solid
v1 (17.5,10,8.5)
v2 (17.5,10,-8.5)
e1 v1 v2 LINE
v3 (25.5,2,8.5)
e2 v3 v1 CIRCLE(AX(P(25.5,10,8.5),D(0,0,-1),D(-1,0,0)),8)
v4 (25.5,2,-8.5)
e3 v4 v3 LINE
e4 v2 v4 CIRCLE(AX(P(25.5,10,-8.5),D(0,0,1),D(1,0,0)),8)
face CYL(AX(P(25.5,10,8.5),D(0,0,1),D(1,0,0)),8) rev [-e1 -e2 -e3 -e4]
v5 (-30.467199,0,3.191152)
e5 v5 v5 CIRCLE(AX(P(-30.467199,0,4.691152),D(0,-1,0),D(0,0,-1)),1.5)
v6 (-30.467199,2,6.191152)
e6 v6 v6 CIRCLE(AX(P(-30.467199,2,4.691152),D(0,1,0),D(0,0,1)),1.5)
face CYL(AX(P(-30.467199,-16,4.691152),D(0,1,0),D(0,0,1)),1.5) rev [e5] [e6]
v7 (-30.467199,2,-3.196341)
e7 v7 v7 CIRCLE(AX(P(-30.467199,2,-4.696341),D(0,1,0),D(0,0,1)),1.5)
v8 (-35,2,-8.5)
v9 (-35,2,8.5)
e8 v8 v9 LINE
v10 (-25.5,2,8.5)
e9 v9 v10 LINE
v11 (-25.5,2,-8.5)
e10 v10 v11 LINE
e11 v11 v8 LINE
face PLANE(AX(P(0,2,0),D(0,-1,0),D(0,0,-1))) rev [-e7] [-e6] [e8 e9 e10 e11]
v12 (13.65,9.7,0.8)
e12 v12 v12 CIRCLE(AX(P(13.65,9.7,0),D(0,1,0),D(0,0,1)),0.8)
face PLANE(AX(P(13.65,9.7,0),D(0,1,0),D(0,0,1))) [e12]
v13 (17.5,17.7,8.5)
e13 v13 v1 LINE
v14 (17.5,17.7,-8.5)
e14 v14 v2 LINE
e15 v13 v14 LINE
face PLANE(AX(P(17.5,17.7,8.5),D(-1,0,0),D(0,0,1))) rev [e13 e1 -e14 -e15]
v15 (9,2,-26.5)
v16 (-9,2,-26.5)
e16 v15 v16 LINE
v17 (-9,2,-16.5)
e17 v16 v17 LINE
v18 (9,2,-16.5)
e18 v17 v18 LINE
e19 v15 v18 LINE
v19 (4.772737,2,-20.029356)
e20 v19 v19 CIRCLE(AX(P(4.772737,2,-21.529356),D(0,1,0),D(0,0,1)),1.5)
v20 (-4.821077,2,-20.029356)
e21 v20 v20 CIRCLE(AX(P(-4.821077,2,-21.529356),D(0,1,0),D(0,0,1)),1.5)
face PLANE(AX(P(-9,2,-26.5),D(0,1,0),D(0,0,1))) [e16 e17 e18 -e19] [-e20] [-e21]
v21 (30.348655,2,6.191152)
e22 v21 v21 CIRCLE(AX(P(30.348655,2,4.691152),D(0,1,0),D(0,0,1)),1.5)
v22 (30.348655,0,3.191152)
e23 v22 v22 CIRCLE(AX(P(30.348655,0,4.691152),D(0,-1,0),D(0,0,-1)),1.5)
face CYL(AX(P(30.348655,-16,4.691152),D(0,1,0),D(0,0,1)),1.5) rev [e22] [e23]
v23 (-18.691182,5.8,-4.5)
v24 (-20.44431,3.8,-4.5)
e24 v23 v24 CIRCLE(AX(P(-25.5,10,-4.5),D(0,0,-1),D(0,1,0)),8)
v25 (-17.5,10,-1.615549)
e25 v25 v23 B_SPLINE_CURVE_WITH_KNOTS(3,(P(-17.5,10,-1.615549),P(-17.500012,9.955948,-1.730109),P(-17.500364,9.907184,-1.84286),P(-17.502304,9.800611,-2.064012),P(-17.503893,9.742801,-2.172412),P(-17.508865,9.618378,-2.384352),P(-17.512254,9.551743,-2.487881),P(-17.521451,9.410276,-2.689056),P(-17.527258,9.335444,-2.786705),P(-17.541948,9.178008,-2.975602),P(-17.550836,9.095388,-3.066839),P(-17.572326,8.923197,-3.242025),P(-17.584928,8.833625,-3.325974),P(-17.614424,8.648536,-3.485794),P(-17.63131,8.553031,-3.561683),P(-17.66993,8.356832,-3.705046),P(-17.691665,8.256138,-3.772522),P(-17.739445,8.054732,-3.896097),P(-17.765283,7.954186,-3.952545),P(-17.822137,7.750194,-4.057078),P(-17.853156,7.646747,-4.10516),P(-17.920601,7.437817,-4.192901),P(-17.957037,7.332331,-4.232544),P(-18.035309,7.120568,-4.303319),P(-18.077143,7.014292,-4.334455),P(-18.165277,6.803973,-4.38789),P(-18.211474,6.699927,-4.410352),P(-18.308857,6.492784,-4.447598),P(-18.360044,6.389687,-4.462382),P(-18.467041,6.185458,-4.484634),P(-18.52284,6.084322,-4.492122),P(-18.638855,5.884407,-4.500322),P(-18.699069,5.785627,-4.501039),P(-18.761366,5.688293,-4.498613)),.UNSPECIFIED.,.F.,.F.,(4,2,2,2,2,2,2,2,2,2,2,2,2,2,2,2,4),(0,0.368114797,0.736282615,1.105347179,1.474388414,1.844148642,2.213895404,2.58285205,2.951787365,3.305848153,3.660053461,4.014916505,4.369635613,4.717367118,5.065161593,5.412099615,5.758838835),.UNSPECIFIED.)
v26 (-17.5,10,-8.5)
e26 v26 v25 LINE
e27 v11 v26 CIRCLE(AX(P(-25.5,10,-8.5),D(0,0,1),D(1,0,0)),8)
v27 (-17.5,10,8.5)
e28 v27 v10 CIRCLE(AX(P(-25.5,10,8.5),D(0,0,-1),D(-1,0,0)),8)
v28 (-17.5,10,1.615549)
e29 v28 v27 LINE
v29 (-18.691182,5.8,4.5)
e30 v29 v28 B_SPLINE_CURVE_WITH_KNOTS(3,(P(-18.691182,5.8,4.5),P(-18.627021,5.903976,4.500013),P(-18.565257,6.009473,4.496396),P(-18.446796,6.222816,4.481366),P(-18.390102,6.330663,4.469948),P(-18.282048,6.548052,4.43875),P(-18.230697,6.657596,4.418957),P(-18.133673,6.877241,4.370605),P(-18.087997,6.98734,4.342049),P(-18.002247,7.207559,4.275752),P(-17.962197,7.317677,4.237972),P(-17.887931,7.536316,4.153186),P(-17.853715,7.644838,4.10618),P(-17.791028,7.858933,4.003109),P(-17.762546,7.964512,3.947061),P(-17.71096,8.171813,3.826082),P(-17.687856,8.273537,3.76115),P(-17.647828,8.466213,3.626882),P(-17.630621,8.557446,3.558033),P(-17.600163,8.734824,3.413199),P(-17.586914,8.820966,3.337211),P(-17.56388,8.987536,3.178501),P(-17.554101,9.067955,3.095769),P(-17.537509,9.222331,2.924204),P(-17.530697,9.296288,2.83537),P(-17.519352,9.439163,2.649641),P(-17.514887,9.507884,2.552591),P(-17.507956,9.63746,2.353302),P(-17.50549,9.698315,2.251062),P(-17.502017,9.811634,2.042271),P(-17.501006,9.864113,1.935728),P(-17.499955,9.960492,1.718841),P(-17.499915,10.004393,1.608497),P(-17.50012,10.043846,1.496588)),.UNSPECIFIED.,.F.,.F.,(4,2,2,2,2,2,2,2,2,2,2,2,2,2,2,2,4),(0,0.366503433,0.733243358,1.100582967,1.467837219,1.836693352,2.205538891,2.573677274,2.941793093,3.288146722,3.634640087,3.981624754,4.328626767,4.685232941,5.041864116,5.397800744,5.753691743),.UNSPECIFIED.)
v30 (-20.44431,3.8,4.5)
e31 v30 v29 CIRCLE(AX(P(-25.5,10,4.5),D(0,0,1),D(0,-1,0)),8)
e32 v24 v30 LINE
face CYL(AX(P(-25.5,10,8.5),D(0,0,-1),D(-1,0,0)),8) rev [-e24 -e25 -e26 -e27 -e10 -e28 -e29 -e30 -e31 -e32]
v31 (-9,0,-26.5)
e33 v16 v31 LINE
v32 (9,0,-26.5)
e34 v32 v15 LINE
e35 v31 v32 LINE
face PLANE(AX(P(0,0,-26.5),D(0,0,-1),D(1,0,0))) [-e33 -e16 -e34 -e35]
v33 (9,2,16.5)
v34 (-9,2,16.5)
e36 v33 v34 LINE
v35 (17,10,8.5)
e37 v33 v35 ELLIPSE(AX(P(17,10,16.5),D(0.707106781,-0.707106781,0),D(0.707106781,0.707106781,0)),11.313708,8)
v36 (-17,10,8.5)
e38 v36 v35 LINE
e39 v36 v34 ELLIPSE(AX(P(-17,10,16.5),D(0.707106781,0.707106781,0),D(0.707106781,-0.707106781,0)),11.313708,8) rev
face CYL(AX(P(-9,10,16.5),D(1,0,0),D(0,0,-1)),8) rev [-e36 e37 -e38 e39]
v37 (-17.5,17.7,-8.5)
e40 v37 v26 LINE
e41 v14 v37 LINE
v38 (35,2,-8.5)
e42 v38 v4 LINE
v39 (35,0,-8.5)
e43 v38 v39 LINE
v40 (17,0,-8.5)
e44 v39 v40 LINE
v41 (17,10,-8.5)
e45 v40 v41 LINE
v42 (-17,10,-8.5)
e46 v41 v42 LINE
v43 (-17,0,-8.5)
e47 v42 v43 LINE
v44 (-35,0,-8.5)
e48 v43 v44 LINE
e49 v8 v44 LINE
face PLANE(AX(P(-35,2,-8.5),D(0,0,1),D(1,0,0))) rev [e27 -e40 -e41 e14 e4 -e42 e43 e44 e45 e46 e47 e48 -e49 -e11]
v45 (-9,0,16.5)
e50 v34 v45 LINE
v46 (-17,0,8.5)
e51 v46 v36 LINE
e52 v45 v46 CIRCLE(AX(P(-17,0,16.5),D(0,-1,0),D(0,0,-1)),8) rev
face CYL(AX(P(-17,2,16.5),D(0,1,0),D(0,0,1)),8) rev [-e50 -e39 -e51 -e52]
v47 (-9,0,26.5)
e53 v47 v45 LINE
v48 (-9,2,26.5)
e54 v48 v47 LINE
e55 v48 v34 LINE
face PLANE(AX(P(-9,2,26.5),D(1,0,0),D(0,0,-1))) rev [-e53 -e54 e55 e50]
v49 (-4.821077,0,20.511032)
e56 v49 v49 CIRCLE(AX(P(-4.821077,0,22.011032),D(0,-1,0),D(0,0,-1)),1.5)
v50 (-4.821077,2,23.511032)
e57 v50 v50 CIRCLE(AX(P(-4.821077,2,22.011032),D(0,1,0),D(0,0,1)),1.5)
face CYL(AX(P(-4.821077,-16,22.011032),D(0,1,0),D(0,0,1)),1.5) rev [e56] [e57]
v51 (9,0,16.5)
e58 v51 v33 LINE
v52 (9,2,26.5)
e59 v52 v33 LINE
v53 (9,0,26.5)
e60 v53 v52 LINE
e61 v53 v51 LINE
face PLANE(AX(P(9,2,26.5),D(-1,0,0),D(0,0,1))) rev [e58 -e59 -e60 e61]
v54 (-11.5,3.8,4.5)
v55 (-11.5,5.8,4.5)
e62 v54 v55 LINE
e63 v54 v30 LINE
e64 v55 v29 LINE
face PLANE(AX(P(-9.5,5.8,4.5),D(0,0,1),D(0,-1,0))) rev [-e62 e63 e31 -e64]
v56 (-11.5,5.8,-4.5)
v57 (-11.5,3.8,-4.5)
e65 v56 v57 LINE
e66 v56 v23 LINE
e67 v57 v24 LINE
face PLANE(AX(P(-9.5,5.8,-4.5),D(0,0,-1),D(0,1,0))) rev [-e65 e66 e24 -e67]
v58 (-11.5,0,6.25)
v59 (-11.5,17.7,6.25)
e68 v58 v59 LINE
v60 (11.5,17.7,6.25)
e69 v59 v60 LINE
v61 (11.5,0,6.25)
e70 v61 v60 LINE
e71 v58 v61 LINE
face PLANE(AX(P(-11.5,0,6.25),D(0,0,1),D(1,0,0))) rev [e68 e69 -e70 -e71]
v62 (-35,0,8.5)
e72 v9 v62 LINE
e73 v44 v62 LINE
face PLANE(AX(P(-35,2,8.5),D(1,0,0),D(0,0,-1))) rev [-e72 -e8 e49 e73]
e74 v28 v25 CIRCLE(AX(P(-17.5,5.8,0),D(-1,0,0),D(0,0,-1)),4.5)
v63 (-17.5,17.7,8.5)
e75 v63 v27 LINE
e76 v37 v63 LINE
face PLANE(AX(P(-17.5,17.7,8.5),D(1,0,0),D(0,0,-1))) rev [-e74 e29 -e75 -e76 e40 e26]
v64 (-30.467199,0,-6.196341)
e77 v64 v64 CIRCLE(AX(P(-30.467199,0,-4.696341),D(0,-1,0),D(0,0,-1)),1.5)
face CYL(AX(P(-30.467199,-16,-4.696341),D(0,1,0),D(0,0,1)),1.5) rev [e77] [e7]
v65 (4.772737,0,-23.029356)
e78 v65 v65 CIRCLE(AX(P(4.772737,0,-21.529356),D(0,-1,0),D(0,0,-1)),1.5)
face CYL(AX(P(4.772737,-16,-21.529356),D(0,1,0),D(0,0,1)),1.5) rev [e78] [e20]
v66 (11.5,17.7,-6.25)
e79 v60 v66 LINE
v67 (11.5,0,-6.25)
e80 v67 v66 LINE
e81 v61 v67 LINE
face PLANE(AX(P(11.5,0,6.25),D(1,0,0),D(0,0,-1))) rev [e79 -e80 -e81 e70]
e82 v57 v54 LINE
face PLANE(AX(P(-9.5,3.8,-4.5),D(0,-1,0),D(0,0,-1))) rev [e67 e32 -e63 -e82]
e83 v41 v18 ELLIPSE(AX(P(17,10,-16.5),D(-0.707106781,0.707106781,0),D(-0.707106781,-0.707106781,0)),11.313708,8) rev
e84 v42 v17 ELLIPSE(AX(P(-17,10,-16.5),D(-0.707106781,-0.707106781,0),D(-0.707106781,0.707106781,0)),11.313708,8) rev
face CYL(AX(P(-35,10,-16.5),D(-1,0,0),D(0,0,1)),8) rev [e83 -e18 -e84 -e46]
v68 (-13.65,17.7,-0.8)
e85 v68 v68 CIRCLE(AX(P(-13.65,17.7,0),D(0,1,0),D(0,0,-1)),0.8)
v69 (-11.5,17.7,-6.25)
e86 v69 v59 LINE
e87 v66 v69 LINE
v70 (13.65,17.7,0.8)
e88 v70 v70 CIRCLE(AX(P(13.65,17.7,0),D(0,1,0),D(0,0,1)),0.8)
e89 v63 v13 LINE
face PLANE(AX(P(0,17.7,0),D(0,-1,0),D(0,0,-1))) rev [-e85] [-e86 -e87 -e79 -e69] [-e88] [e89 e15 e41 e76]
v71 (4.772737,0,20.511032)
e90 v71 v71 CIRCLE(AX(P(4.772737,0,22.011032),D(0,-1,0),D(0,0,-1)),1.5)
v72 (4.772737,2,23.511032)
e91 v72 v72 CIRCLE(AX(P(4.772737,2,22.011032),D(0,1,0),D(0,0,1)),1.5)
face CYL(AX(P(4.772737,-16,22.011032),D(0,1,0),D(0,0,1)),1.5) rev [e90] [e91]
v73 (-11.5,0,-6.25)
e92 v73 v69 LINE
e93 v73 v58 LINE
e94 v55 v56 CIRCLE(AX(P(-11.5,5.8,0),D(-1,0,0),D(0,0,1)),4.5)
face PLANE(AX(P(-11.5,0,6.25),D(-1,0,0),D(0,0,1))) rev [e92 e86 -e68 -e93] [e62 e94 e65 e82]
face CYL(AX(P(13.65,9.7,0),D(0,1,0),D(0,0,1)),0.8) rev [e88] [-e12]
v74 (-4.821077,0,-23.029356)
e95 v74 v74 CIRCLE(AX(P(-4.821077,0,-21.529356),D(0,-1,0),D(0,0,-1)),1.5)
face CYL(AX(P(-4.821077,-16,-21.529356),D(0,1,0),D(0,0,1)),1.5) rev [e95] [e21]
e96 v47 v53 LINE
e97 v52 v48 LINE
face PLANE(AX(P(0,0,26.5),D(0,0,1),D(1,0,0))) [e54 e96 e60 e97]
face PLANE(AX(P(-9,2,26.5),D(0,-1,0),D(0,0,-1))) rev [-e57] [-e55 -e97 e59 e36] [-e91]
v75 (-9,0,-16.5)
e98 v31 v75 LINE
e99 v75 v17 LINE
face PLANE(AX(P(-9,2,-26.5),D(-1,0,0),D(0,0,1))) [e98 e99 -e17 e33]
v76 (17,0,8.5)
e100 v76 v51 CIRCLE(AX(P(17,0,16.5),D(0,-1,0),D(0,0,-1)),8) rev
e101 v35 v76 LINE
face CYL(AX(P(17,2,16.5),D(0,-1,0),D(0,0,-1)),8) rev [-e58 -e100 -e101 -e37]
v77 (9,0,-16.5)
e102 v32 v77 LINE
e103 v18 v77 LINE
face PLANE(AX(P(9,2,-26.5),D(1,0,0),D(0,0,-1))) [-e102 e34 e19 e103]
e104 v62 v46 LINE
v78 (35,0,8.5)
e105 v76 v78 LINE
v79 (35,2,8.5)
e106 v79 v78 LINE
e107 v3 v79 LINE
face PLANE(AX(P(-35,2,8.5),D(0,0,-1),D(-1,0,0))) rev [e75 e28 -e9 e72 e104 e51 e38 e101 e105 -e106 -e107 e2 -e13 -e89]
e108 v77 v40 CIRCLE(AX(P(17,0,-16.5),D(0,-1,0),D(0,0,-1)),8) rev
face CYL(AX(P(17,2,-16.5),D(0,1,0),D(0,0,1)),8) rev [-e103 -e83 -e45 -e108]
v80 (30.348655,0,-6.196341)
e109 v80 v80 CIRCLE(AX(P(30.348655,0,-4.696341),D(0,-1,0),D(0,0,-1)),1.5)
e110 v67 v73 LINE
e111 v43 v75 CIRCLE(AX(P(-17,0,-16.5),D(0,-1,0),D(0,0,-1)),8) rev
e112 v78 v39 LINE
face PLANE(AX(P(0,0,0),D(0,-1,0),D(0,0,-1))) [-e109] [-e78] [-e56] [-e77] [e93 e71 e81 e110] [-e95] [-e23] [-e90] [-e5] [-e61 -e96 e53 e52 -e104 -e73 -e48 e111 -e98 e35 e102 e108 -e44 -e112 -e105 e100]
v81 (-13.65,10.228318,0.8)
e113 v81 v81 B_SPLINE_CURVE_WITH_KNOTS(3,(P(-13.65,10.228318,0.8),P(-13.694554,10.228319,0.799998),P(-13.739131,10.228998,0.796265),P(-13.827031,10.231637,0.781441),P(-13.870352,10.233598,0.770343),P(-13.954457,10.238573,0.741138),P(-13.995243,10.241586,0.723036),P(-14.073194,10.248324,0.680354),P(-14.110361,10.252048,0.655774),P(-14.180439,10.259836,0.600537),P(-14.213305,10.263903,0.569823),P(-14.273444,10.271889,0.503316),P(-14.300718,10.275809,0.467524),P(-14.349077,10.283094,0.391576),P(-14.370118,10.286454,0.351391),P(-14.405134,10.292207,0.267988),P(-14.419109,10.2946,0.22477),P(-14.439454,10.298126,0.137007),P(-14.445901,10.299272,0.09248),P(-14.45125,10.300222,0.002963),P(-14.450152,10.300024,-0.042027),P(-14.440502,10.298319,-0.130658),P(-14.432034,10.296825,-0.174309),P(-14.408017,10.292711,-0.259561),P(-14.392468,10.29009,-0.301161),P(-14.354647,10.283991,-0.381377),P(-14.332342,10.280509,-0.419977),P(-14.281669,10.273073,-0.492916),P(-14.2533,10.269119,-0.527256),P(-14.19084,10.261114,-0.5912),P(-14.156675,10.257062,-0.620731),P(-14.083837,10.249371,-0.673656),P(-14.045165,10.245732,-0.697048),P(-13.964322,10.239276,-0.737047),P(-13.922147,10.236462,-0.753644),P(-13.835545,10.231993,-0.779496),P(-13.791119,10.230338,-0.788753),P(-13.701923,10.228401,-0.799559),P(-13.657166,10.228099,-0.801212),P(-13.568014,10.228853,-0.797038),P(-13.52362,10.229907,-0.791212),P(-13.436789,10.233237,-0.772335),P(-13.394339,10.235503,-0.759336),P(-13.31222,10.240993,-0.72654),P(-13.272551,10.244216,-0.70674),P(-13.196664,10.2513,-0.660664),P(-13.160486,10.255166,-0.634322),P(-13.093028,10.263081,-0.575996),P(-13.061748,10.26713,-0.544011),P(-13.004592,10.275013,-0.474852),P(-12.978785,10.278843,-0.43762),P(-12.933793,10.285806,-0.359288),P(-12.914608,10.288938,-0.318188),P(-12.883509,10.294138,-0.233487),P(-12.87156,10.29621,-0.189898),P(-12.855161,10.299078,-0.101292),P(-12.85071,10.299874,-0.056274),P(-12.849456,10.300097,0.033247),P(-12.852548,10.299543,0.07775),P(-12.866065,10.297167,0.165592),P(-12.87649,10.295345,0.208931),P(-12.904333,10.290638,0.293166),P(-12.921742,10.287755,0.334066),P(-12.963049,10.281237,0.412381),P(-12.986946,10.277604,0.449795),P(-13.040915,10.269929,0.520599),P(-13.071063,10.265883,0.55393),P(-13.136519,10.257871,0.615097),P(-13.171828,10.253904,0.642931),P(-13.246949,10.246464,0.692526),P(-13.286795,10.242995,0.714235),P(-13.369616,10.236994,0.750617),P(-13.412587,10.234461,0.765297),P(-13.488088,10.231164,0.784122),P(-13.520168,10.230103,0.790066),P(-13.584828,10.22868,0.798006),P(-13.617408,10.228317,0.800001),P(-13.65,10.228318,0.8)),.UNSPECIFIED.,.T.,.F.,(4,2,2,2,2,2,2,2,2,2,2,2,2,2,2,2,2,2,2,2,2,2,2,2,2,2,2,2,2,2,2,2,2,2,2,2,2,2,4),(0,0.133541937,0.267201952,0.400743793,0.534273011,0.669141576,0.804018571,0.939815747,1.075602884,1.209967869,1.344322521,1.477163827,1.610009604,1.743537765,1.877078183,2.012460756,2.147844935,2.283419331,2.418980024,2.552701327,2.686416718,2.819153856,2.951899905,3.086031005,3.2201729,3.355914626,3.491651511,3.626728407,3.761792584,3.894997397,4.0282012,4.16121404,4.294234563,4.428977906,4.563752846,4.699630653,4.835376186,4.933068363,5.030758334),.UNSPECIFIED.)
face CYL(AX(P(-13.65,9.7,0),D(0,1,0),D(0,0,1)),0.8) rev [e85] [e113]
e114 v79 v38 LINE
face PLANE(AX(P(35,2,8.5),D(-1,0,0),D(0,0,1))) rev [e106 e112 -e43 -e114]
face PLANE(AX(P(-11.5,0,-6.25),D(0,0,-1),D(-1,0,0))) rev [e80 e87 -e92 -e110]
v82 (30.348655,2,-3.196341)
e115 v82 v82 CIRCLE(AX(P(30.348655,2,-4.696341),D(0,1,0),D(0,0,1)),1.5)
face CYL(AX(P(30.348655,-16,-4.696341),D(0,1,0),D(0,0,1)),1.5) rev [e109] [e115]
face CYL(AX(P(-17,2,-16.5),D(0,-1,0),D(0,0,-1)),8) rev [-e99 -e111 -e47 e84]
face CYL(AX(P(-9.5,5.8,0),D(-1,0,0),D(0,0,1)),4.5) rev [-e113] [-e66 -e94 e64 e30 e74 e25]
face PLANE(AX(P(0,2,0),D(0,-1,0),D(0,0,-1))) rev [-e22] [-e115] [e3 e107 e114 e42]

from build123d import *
from build123d.topology import SkipClean

# Parameters (mm, degrees)
SKETCH2_W           = 70
SKETCH2_H           = 17
BOSS_EXTRUDE1_DEPTH = 2
SKETCH3_W           = 35
SKETCH3_H           = 17
BOSS_EXTRUDE2_DEPTH = 15.7
SKETCH4_W           = 23
SKETCH4_H           = 12.5
CUT_EXTRUDE1_DEPTH  = 41.131533736
SKETCH6_R           = 0.8
CUT_EXTRUDE2_DEPTH  = 8
CUT_EXTRUDE3_DEPTH  = 8
SKETCH9_W           = 18
SKETCH9_H           = 2
BOSS_EXTRUDE3_DEPTH = 18
FILLET1_R           = 8
FILLET2_R           = 8
FILLET3_START       = -8.5
FILLET3_DEPTH       = 17
FILLET3_START_2     = -25.5
FILLET3_2_DEPTH     = 8
SKETCH11_R          = 1.5
CUT_EXTRUDE4_DEPTH  = 18


with BuildPart() as part:
    # Sketch2 → Boss-Extrude1 (new body)
    with BuildSketch(Plane(origin=(0, 0, 0), x_dir=(1, 0, 0), z_dir=(0, 1, 0))):
        Rectangle(SKETCH2_W, SKETCH2_H)
    extrude(amount=BOSS_EXTRUDE1_DEPTH)

    # Sketch3 → Boss-Extrude2 (add)
    with BuildSketch(Plane(origin=(0, 2, 0), x_dir=(1, 0, 0), z_dir=(0, 1, 0))):
        Rectangle(SKETCH3_W, SKETCH3_H)
    extrude(amount=BOSS_EXTRUDE2_DEPTH)

    # Sketch4 → Cut-Extrude1 (cut, through all)
    with BuildSketch(Plane(origin=(0, 17.7, 0), x_dir=(1, 0, 0), z_dir=(0, 1, 0))):
        Rectangle(SKETCH4_W, SKETCH4_H)
    extrude(amount=-CUT_EXTRUDE1_DEPTH, mode=Mode.SUBTRACT)

    # Sketch6 → Cut-Extrude2 (cut)
    with BuildSketch(Plane(origin=(0, 17.7, 0), x_dir=(1, 0, 0), z_dir=(0, 1, 0))):
        with Locations(Location((13.65, 0, 0), (0, 0, 270))):
            Circle(SKETCH6_R)
        with Locations(Location((-13.65, 0, 0), (0, 0, 90))):
            Circle(SKETCH6_R)
    extrude(amount=-CUT_EXTRUDE2_DEPTH, mode=Mode.SUBTRACT)

    # Sketch7 → Cut-Extrude3 (cut)
    with BuildSketch(Plane.ZY.offset(17.5)):
        with BuildLine():
            Line((-4.5, 5.8), (-4.5, 3.8))
            Line((-4.5, 3.8), (4.5, 3.8))
            Line((4.5, 3.8), (4.5, 5.8))
            ThreePointArc((4.5, 5.8), (0, 10.3), (-4.5, 5.8))
        make_face()
    extrude(amount=-CUT_EXTRUDE3_DEPTH, mode=Mode.SUBTRACT)

    # Sketch9 → Boss-Extrude3 (add)
    with BuildSketch(Plane.XY.offset(8.5)):
        with Locations((0, 1)):
            Rectangle(SKETCH9_W, SKETCH9_H)
    boss_extrude3 = extrude(amount=BOSS_EXTRUDE3_DEPTH)

    # Mirror1: Boss-Extrude3 across plane
    add(boss_extrude3.mirror(Plane.XY))

    # Fillet1
    fillet1_edges = [part.edges().sort_by_distance(p)[0] for p in [
        (0, 2, 8.5),
    ]]
    fillet(fillet1_edges, radius=FILLET1_R)

    # Fillet2
    fillet2_edges = [part.edges().sort_by_distance(p)[0] for p in [
        (-9, 1, -8.5),
        (-9, 5, 8.5),
        (9, 5, 8.5),
        (9, 1, -8.5),
        (0, 2, -8.5),
        (17.5, 2, 0),
    ]]
    fillet(fillet2_edges, radius=FILLET2_R)

    # Fillet3: read off the stored shape, not the designer's step
    # Fillet3 outline → Fillet3 (add)
    with BuildSketch(Plane.XY.offset(FILLET3_START)):
        with BuildLine():
            ThreePointArc((-17.5, 10.00000495), (-19.843144, 4.343147501), (-25.5, 2))
            Line((-25.5, 2), (-17.5, 2))
            Line((-17.5, 2), (-17.5, 10.00000495))
        make_face()
    extrude(amount=FILLET3_DEPTH)

    # Fillet3 2 outline → Fillet3 2 (cut)
    with SkipClean():  # the faces are left unmerged after this step: merging them gives an invalid solid
        with BuildSketch(Plane.YZ.offset(FILLET3_START_2)):
            with BuildLine():
                ThreePointArc((5.799996271, -4.5), (10.3, -1.865e-06), (5.8, 4.5))
                Line((5.8, 4.5), (3.8, 4.5))
                Line((3.8, 4.5), (3.8, -4.5))
                Line((3.8, -4.5), (5.799996271, -4.5))
            make_face()
        extrude(amount=FILLET3_2_DEPTH, mode=Mode.SUBTRACT)

    # Sketch11 → Cut-Extrude4 (cut)
    with SkipClean():  # the faces are left unmerged after this step: merging them gives an invalid solid
        with BuildSketch(Plane(origin=(0, 2, 0), x_dir=(1, 0, 0), z_dir=(0, 1, 0))):
            with Locations(Location((4.772736854, 21.529356347, 0), (0, 0, 270))):
                Circle(SKETCH11_R)
            with Locations(Location((-4.821076753, 21.529356347, 0), (0, 0, 270))):
                Circle(SKETCH11_R)
            with Locations(Location((4.772736854, -22.011031546, 0), (0, 0, 270))):
                Circle(SKETCH11_R)
            with Locations(Location((-4.821076753, -22.011031546, 0), (0, 0, 270))):
                Circle(SKETCH11_R)
            with Locations(Location((30.348655276, 4.696340636, 0), (0, 0, 270))):
                Circle(SKETCH11_R)
            with Locations(Location((30.348655276, -4.691151825, 0), (0, 0, 270))):
                Circle(SKETCH11_R)
            with Locations(Location((-30.467199024, -4.691151825, 0), (0, 0, 270))):
                Circle(SKETCH11_R)
            with Locations(Location((-30.467199024, 4.696340636, 0), (0, 0, 270))):
                Circle(SKETCH11_R)
        extrude(amount=-CUT_EXTRUDE4_DEPTH, mode=Mode.SUBTRACT)


solid = part.part
